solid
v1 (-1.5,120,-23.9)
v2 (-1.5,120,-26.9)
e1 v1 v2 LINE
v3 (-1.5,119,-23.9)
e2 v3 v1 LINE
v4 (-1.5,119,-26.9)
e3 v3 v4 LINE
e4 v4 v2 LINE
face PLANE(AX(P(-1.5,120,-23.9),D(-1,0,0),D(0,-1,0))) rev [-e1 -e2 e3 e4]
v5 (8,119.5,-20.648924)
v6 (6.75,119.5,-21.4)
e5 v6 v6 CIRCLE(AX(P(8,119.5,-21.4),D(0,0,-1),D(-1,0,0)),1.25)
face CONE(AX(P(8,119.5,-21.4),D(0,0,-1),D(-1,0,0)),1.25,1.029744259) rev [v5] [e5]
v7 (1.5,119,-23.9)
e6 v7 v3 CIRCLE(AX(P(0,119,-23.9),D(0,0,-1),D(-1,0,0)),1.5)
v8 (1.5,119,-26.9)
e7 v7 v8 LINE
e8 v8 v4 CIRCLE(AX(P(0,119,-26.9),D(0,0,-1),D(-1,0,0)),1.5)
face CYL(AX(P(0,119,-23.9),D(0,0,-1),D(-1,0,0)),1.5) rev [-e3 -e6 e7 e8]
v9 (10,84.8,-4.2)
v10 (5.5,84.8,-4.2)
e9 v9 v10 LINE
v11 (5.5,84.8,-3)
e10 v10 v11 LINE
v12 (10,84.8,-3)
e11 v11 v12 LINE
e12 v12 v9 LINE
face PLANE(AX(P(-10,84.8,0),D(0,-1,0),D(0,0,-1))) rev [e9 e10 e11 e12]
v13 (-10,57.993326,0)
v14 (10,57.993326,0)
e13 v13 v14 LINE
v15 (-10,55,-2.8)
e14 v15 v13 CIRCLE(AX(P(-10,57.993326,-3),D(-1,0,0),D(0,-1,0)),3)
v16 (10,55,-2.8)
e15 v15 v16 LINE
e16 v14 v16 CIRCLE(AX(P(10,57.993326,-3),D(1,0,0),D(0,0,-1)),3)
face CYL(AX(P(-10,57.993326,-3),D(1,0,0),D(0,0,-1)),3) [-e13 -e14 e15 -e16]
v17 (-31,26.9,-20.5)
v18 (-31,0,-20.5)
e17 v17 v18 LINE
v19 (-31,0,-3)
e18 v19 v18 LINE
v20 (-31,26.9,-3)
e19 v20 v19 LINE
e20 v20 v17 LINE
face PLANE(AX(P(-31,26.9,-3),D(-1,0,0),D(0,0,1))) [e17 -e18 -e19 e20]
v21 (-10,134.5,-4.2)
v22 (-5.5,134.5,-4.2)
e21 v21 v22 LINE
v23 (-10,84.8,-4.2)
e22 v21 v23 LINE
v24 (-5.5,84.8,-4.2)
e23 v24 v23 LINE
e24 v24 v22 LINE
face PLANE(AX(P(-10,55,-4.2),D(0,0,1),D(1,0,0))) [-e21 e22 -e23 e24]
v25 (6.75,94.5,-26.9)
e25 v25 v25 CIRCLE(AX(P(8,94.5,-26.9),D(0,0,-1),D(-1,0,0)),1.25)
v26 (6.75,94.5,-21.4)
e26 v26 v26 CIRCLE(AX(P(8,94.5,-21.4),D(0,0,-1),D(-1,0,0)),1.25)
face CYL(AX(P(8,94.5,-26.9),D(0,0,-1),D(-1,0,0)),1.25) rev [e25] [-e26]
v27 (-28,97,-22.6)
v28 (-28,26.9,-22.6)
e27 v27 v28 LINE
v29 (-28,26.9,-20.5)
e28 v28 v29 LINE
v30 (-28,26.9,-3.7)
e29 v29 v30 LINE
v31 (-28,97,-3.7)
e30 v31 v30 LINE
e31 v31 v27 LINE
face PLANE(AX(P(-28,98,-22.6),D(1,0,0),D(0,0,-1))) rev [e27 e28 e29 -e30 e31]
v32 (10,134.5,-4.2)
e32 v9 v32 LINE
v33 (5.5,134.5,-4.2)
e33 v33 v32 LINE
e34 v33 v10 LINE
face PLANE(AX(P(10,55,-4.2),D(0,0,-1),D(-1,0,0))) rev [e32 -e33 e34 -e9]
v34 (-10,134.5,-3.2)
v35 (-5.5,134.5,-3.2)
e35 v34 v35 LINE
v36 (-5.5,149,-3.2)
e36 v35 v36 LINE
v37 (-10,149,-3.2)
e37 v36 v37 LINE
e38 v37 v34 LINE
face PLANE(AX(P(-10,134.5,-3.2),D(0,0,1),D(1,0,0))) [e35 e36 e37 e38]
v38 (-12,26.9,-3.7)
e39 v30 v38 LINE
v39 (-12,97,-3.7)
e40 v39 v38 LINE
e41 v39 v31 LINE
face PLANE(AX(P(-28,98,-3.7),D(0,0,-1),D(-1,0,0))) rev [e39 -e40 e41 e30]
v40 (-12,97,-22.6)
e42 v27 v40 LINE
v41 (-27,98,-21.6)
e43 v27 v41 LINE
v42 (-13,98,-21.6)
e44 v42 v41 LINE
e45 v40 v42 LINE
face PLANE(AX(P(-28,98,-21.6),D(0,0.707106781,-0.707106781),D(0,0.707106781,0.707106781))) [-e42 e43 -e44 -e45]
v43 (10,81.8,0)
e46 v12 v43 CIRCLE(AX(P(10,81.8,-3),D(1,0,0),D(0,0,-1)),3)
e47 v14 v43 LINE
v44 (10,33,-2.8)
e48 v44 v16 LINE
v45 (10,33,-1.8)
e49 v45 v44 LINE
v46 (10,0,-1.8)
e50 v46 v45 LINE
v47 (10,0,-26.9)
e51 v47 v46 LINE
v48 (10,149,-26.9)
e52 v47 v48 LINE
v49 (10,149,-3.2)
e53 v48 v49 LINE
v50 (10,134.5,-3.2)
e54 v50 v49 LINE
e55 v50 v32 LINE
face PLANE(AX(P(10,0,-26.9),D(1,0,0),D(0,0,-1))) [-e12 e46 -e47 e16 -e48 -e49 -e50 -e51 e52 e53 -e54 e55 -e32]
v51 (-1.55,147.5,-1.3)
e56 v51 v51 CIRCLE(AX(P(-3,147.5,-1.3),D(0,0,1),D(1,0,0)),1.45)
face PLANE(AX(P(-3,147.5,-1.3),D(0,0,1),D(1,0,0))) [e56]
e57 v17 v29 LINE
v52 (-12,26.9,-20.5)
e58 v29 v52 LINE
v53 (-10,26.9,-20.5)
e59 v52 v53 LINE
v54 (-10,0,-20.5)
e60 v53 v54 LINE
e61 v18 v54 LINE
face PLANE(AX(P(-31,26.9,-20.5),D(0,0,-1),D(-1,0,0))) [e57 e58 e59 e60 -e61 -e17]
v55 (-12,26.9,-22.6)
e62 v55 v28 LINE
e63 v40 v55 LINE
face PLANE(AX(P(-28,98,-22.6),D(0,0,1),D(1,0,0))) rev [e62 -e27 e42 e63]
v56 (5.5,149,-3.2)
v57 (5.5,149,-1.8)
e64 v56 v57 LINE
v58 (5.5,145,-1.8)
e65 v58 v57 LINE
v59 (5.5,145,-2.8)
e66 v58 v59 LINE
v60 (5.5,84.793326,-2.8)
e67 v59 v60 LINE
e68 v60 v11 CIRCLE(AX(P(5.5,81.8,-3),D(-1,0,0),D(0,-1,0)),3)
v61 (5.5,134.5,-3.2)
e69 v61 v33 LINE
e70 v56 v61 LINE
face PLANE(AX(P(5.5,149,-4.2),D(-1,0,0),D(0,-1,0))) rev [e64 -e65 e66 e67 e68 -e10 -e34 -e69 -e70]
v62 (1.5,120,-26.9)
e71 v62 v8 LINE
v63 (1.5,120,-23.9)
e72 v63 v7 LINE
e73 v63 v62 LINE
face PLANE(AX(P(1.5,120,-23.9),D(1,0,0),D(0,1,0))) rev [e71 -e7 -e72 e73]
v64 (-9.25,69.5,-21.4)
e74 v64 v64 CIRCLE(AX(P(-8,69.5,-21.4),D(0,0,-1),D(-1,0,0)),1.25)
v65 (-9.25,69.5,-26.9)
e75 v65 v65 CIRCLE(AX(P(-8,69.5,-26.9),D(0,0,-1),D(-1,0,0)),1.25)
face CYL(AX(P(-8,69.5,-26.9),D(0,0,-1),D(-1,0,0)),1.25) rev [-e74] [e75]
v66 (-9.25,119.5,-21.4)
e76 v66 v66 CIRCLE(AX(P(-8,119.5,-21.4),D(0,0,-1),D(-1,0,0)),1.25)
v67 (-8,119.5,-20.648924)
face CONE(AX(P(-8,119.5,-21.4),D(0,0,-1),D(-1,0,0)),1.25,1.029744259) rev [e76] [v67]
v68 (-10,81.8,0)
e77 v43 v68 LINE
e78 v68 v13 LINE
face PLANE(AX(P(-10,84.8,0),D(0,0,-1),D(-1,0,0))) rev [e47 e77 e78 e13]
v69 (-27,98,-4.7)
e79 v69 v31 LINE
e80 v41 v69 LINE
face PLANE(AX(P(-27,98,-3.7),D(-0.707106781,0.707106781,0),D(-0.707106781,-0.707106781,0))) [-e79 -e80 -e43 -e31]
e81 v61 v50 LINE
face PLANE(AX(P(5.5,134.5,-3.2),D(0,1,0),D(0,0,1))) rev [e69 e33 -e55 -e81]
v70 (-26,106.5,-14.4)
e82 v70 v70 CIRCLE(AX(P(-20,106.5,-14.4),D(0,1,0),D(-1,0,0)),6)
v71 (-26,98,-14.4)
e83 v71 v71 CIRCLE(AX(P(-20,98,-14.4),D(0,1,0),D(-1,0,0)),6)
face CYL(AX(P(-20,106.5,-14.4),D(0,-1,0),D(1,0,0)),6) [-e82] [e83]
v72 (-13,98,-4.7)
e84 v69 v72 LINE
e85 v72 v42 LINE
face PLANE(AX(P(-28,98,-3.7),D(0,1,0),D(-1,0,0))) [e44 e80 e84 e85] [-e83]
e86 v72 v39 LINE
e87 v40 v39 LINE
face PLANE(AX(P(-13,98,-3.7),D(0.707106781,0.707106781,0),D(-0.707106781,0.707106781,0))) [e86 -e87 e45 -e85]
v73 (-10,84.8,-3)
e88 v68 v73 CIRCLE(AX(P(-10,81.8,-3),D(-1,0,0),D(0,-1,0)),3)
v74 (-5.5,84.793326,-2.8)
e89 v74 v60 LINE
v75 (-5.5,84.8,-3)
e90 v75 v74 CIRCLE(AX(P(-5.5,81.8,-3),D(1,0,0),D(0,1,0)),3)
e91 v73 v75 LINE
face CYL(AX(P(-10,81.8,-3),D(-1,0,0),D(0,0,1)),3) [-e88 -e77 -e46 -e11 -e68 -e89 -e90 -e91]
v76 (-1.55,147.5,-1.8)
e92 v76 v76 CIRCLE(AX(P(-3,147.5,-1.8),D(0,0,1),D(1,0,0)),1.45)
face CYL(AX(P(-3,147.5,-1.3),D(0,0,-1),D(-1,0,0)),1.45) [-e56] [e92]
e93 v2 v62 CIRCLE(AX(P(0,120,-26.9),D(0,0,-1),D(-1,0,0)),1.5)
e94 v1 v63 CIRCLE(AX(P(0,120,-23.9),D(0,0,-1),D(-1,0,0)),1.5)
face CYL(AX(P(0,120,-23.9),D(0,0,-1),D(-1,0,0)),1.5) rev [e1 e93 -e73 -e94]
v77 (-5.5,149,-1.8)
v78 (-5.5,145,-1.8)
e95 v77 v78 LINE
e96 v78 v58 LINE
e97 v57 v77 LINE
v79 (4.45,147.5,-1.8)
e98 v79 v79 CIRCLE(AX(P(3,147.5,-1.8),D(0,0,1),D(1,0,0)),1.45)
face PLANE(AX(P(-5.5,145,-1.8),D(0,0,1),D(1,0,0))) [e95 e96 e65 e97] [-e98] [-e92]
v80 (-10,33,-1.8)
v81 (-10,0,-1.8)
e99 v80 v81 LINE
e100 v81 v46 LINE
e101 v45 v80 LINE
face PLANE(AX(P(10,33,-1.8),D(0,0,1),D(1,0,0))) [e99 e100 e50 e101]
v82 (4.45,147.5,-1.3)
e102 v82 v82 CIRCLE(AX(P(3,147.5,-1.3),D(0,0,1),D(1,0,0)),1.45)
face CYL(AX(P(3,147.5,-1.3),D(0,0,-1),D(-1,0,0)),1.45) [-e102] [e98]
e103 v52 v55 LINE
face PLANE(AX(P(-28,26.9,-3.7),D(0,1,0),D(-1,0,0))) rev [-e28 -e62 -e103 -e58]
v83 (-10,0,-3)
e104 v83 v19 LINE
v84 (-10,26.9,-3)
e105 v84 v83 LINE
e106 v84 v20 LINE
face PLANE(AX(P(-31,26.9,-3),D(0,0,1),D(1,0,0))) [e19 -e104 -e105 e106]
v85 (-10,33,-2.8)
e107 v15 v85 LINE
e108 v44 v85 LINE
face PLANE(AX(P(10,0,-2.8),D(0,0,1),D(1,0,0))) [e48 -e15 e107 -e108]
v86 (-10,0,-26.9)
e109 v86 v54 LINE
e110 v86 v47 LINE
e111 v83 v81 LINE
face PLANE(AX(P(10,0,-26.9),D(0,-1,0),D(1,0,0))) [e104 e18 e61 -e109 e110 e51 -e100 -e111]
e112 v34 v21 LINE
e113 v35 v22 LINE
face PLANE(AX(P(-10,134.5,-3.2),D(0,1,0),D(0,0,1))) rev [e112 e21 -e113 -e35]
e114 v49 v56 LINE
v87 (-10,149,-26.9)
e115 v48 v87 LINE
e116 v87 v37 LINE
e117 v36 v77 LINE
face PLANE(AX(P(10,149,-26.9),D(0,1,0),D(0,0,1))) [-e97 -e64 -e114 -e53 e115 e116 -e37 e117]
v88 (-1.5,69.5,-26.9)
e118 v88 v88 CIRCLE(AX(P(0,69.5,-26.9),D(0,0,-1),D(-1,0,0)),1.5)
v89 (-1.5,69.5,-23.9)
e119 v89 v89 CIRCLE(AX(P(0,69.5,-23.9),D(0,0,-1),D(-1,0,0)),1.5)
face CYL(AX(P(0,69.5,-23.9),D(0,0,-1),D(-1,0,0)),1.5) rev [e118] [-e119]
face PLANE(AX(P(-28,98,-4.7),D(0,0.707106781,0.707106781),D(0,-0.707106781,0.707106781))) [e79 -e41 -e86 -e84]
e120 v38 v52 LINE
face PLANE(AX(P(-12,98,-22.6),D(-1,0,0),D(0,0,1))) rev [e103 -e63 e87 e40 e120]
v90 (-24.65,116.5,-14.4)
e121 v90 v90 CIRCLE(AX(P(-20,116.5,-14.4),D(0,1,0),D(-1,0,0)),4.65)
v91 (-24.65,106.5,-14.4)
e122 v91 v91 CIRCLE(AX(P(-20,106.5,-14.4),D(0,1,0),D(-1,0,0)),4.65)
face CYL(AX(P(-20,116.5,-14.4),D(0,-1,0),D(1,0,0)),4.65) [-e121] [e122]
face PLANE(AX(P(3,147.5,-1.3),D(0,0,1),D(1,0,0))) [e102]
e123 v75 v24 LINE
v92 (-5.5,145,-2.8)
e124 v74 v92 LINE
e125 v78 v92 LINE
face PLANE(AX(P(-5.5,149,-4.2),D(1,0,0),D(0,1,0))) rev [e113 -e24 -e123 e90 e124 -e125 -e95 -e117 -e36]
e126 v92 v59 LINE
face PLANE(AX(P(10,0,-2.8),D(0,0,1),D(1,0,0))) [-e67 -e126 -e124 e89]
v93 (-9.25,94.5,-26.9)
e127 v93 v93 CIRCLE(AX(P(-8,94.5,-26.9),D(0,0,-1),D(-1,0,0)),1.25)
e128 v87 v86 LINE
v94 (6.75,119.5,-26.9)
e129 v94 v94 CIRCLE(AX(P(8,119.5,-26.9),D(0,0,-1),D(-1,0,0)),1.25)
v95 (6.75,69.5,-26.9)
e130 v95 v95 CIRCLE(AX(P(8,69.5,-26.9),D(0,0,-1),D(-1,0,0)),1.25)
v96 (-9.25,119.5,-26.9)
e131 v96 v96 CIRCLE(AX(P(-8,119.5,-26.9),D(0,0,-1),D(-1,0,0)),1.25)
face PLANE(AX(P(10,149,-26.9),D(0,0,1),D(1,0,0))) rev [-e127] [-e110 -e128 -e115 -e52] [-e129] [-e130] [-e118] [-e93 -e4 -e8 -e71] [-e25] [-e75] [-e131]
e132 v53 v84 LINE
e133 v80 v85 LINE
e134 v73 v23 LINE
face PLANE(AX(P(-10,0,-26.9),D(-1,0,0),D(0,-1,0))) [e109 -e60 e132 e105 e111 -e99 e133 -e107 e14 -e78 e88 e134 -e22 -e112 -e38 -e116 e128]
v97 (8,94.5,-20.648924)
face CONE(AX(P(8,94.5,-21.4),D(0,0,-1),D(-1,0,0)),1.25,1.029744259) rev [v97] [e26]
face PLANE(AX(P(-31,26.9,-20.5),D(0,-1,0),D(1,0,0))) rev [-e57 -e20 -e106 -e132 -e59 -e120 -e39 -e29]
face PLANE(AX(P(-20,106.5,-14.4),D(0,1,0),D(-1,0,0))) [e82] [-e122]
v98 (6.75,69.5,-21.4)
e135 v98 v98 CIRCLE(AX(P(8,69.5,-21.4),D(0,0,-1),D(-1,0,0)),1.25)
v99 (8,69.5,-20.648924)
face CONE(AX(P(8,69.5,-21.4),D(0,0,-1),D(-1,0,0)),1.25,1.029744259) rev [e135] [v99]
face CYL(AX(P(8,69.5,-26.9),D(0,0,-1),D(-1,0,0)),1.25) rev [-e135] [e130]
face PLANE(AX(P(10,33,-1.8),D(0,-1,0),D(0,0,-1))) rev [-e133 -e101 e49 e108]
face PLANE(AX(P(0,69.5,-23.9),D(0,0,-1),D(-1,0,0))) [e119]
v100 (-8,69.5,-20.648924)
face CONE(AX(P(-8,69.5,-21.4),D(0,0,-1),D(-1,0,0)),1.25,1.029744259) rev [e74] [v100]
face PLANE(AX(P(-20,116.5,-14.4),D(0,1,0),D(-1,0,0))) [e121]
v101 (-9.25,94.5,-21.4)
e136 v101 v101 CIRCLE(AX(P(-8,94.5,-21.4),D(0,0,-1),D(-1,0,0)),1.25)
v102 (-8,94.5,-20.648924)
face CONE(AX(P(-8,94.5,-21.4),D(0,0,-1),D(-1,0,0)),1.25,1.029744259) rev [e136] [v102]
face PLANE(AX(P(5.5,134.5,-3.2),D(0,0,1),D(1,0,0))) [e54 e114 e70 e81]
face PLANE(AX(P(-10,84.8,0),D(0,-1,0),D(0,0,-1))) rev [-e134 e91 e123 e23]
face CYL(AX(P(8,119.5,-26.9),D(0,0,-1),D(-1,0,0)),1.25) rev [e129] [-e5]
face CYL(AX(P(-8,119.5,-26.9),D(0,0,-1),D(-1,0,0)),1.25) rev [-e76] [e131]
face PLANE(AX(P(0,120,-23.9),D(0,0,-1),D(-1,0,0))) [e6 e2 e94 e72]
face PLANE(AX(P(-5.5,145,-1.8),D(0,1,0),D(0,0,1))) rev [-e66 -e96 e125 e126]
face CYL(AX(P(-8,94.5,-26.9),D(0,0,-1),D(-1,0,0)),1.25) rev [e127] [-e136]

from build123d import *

# Parameters (mm, degrees)
SKETCH1_W                      = 20
SKETCH1_H                      = 149
BOSS_EXTRUDE1_DEPTH            = 26.9
SKETCH2_W                      = 21
SKETCH2_H                      = 17.5
BOSS_EXTRUDE2_DEPTH            = 26.9
SKETCH3_W                      = 16
SKETCH3_H                      = 18.9
BOSS_EXTRUDE3_DEPTH            = 71.1
SKETCH4_R                      = 6
BOSS_EXTRUDE4_DEPTH            = 8.5
SKETCH5_R                      = 4.65
BOSS_EXTRUDE5_DEPTH            = 10
SKETCH7_W                      = 20
SKETCH7_H                      = 149
CUT_EXTRUDE1_DEPTH             = 2.8
SKETCH8_W                      = 4.5
SKETCH8_H                      = 94
CUT_EXTRUDE2_DEPTH             = 1.4
SKETCH17_R                     = 1.5
CUT_EXTRUDE3_DEPTH             = 3
SKETCH9_W                      = 20
SKETCH9_H                      = 29.8
BOSS_EXTRUDE6_DEPTH            = 4.2
SKETCH12_W                     = 20
SKETCH12_H                     = 33
BOSS_EXTRUDE7_DEPTH            = 1
SKETCH14_W                     = 11
SKETCH14_H                     = 4
BOSS_EXTRUDE8_DEPTH            = 1
SKETCH15_R                     = 1.45
BOSS_EXTRUDE9_DEPTH            = 0.5
SKETCH16_W                     = 4.5
SKETCH16_H                     = 14.5
BOSS_EXTRUDE10_DEPTH           = 1
M3X0_5_TAPPED_HOLE1_AT_2_COUNT = 2
M3X0_5_TAPPED_HOLE1_AT_2_PITCH = 16
LPATTERN1_COUNT                = 3
LPATTERN1_PITCH                = 25
FILLET1_R                      = 3
CHAMFER1_SIZE                  = 1


with BuildPart() as part:
    # Sketch1 → Boss-Extrude1 (new body)
    with BuildSketch(Plane.XY):
        with Locations((0, 74.5)):
            Rectangle(SKETCH1_W, SKETCH1_H)
    extrude(amount=-BOSS_EXTRUDE1_DEPTH)

    # Sketch2 → Boss-Extrude2 (add)
    with BuildSketch(Plane.XZ):
        with Locations((-20.5, -11.75)):
            Rectangle(SKETCH2_W, SKETCH2_H)
    extrude(amount=-BOSS_EXTRUDE2_DEPTH)

    # Sketch3 → Boss-Extrude3 (add)
    with BuildSketch(Plane(origin=(0, 26.9, 0), x_dir=(1, 0, 0), z_dir=(0, 1, 0))):
        with Locations((-20, 13.15)):
            Rectangle(SKETCH3_W, SKETCH3_H)
    extrude(amount=BOSS_EXTRUDE3_DEPTH)

    # Sketch4 → Boss-Extrude4 (add)
    with BuildSketch(Plane(origin=(0, 98, 0), x_dir=(1, 0, 0), z_dir=(0, 1, 0))):
        with Locations(Location((-20, 14.4, 0), (0, 0, 180))):
            Circle(SKETCH4_R)
    extrude(amount=BOSS_EXTRUDE4_DEPTH)

    # Sketch5 → Boss-Extrude5 (add)
    with BuildSketch(Plane(origin=(0, 106.5, 0), x_dir=(1, 0, 0), z_dir=(0, 1, 0))):
        with Locations(Location((-20, 14.4, 0), (0, 0, 180))):
            Circle(SKETCH5_R)
    extrude(amount=BOSS_EXTRUDE5_DEPTH)

    # Sketch7 → Cut-Extrude1 (cut)
    with BuildSketch(Plane.XY):
        with Locations((0, 74.5)):
            Rectangle(SKETCH7_W, SKETCH7_H)
    extrude(amount=-CUT_EXTRUDE1_DEPTH, mode=Mode.SUBTRACT)

    # Sketch8 → Cut-Extrude2 (cut)
    with BuildSketch(Plane.XY.offset(-2.8)):
        with Locations((-7.75, 102)):
            Rectangle(SKETCH8_W, SKETCH8_H)
        with Locations((7.75, 102)):
            Rectangle(SKETCH8_W, SKETCH8_H)
    extrude(amount=-CUT_EXTRUDE2_DEPTH, mode=Mode.SUBTRACT)

    # Sketch17 → Cut-Extrude3 (cut)
    with BuildSketch(Plane(origin=(0, 0, -26.9), x_dir=(-1, 0, 0), z_dir=(0, 0, -1))):
        with Locations((0, 69.5)):
            Circle(SKETCH17_R)
        with BuildLine():
            Line((1.5, 120), (1.5, 119))
            ThreePointArc((1.5, 119), (0, 117.5), (-1.5, 119))
            Line((-1.5, 119), (-1.5, 120))
            ThreePointArc((-1.5, 120), (0, 121.5), (1.5, 120))
        make_face()
    extrude(amount=-CUT_EXTRUDE3_DEPTH, mode=Mode.SUBTRACT)

    # Sketch9 → Boss-Extrude6 (add)
    with BuildSketch(Plane.XY.offset(-4.2)):
        with Locations((0, 69.9)):
            Rectangle(SKETCH9_W, SKETCH9_H)
    extrude(amount=BOSS_EXTRUDE6_DEPTH)

    # Sketch12 → Boss-Extrude7 (add)
    with BuildSketch(Plane.XY.offset(-2.8)):
        with Locations((0, 16.5)):
            Rectangle(SKETCH12_W, SKETCH12_H)
    extrude(amount=BOSS_EXTRUDE7_DEPTH)

    # Sketch14 → Boss-Extrude8 (add)
    with BuildSketch(Plane.XY.offset(-2.8)):
        with Locations((0, 147)):
            Rectangle(SKETCH14_W, SKETCH14_H)
    extrude(amount=BOSS_EXTRUDE8_DEPTH)

    # Sketch15 → Boss-Extrude9 (add)
    with BuildSketch(Plane.XY.offset(-1.8)):
        with Locations((-3, 147.5)):
            Circle(SKETCH15_R)
        with Locations((3, 147.5)):
            Circle(SKETCH15_R)
    extrude(amount=BOSS_EXTRUDE9_DEPTH)

    # Sketch16 → Boss-Extrude10 (add)
    with BuildSketch(Plane.XY.offset(-4.2)):
        with Locations((-7.75, 141.75)):
            Rectangle(SKETCH16_W, SKETCH16_H)
        with Locations((7.75, 141.75)):
            Rectangle(SKETCH16_W, SKETCH16_H)
    extrude(amount=BOSS_EXTRUDE10_DEPTH)

    # Sketch10 → M3x0.5 Tapped Hole1 (revolve, cut)
    with BuildSketch(Plane(origin=(8, 69.5, -26.9), x_dir=(0, 1, 0), z_dir=(1, 0, 0))):
        Polygon((0, 0), (0, 6.251075774), (1.25, 5.5), (1.25, 0), align=None)
    m3x0_5_tapped_hole1 = revolve(axis=Axis((8, 69.5, -33.25), (0, 0, 1)), mode=Mode.SUBTRACT)

    # M3x0.5 Tapped Hole1 at 2: M3x0.5 Tapped Hole1 ×2
    with Locations(*[(-i * M3X0_5_TAPPED_HOLE1_AT_2_PITCH, 0, 0) for i in range(1, M3X0_5_TAPPED_HOLE1_AT_2_COUNT)]):
        add(m3x0_5_tapped_hole1, mode=Mode.SUBTRACT)

    # LPattern1: M3x0.5 Tapped Hole1 ×3
    with Locations(*[(0, i * LPATTERN1_PITCH, 0) for i in range(1, LPATTERN1_COUNT)]):
        add(m3x0_5_tapped_hole1, mode=Mode.SUBTRACT)

    # LPattern1 copy 1 sketch → LPattern1 copy 1 (revolve, cut)
    with BuildSketch(Plane(origin=(-8, 94.5, -26.9), x_dir=(0, 1, 0), z_dir=(1, 0, 0))):
        Polygon((0, 0), (0, 6.251075774), (1.25, 5.5), (1.25, 0), align=None)
    revolve(axis=Axis((-8, 94.5, -33.25), (0, 0, 1)), mode=Mode.SUBTRACT)

    # LPattern1 copy 2 sketch → LPattern1 copy 2 (revolve, cut)
    with BuildSketch(Plane(origin=(-8, 119.5, -26.9), x_dir=(0, 1, 0), z_dir=(1, 0, 0))):
        Polygon((0, 0), (0, 6.251075774), (1.25, 5.5), (1.25, 0), align=None)
    revolve(axis=Axis((-8, 119.5, -33.25), (0, 0, 1)), mode=Mode.SUBTRACT)

    # Fillet1
    # the kernel refuses this fillet: 3 mm, written as the material it takes off along each edge
    with BuildSketch(Plane(origin=(-17.483314774, 55, 0), x_dir=(0, 1, 0), z_dir=(1, 0, 0))) as fillet1_piece_1:
        with BuildLine():
            CenterArc((2.993325909, -3), FILLET1_R, 90, 86.177446271)
            Line((0, -2.8), (0, 0))
            Line((0, 0), (2.993325909, 0))
        make_face()
    extrude(amount=34.966629547, mode=Mode.SUBTRACT)
    with BuildSketch(Plane(origin=(17.5, 84.8, 0), x_dir=(0, 0, -1), z_dir=(-1, 0, 0))) as fillet1_piece_2_section:
        with BuildLine():
            CenterArc((FILLET1_R, FILLET1_R), FILLET1_R, 180, 90)
            Line((0, FILLET1_R), (0, 0))
            Line((0, 0), (FILLET1_R, 0))
        make_face()
    fillet1_piece_2 = extrude(amount=35, mode=Mode.PRIVATE)
    fillet1_piece_2 = split(fillet1_piece_2, bisect_by=Plane(origin=(5.5, 84.8, 0), z_dir=(1, 0, 0)), keep=Keep.TOP, mode=Mode.PRIVATE)
    add(fillet1_piece_2, mode=Mode.SUBTRACT)
    with BuildSketch(Plane(origin=(17.5, 84.8, 0), x_dir=(0, 0, -1), z_dir=(-1, 0, 0))) as fillet1_piece_3_section:
        with BuildLine():
            CenterArc((FILLET1_R, FILLET1_R), FILLET1_R, 180, 90)
            Line((0, FILLET1_R), (0, 0))
            Line((0, 0), (FILLET1_R, 0))
        make_face()
    fillet1_piece_3 = extrude(amount=35, mode=Mode.PRIVATE)
    fillet1_piece_3 = split(fillet1_piece_3, bisect_by=Plane(origin=(17.5, 84.8, -2.8), z_dir=(0, 0, 1)), keep=Keep.TOP, mode=Mode.PRIVATE)
    add(fillet1_piece_3, mode=Mode.SUBTRACT)
    with BuildSketch(Plane(origin=(17.5, 84.8, 0), x_dir=(0, 0, -1), z_dir=(-1, 0, 0))) as fillet1_piece_4_section:
        with BuildLine():
            CenterArc((FILLET1_R, FILLET1_R), FILLET1_R, 180, 90)
            Line((0, FILLET1_R), (0, 0))
            Line((0, 0), (FILLET1_R, 0))
        make_face()
    fillet1_piece_4 = extrude(amount=35, mode=Mode.PRIVATE)
    fillet1_piece_4 = split(fillet1_piece_4, bisect_by=Plane(origin=(-5.5, 84.8, 0), z_dir=(-1, 0, 0)), keep=Keep.TOP, mode=Mode.PRIVATE)
    add(fillet1_piece_4, mode=Mode.SUBTRACT)

    # Chamfer1
    chamfer1_edges = [part.edges().sort_by_distance(p)[0] for p in [
        (-28, 98, -13.15),
        (-20, 98, -3.7),
        (-12, 98, -13.15),
        (-20, 98, -22.6),
    ]]
    chamfer(chamfer1_edges, length=CHAMFER1_SIZE)


solid = part.part
